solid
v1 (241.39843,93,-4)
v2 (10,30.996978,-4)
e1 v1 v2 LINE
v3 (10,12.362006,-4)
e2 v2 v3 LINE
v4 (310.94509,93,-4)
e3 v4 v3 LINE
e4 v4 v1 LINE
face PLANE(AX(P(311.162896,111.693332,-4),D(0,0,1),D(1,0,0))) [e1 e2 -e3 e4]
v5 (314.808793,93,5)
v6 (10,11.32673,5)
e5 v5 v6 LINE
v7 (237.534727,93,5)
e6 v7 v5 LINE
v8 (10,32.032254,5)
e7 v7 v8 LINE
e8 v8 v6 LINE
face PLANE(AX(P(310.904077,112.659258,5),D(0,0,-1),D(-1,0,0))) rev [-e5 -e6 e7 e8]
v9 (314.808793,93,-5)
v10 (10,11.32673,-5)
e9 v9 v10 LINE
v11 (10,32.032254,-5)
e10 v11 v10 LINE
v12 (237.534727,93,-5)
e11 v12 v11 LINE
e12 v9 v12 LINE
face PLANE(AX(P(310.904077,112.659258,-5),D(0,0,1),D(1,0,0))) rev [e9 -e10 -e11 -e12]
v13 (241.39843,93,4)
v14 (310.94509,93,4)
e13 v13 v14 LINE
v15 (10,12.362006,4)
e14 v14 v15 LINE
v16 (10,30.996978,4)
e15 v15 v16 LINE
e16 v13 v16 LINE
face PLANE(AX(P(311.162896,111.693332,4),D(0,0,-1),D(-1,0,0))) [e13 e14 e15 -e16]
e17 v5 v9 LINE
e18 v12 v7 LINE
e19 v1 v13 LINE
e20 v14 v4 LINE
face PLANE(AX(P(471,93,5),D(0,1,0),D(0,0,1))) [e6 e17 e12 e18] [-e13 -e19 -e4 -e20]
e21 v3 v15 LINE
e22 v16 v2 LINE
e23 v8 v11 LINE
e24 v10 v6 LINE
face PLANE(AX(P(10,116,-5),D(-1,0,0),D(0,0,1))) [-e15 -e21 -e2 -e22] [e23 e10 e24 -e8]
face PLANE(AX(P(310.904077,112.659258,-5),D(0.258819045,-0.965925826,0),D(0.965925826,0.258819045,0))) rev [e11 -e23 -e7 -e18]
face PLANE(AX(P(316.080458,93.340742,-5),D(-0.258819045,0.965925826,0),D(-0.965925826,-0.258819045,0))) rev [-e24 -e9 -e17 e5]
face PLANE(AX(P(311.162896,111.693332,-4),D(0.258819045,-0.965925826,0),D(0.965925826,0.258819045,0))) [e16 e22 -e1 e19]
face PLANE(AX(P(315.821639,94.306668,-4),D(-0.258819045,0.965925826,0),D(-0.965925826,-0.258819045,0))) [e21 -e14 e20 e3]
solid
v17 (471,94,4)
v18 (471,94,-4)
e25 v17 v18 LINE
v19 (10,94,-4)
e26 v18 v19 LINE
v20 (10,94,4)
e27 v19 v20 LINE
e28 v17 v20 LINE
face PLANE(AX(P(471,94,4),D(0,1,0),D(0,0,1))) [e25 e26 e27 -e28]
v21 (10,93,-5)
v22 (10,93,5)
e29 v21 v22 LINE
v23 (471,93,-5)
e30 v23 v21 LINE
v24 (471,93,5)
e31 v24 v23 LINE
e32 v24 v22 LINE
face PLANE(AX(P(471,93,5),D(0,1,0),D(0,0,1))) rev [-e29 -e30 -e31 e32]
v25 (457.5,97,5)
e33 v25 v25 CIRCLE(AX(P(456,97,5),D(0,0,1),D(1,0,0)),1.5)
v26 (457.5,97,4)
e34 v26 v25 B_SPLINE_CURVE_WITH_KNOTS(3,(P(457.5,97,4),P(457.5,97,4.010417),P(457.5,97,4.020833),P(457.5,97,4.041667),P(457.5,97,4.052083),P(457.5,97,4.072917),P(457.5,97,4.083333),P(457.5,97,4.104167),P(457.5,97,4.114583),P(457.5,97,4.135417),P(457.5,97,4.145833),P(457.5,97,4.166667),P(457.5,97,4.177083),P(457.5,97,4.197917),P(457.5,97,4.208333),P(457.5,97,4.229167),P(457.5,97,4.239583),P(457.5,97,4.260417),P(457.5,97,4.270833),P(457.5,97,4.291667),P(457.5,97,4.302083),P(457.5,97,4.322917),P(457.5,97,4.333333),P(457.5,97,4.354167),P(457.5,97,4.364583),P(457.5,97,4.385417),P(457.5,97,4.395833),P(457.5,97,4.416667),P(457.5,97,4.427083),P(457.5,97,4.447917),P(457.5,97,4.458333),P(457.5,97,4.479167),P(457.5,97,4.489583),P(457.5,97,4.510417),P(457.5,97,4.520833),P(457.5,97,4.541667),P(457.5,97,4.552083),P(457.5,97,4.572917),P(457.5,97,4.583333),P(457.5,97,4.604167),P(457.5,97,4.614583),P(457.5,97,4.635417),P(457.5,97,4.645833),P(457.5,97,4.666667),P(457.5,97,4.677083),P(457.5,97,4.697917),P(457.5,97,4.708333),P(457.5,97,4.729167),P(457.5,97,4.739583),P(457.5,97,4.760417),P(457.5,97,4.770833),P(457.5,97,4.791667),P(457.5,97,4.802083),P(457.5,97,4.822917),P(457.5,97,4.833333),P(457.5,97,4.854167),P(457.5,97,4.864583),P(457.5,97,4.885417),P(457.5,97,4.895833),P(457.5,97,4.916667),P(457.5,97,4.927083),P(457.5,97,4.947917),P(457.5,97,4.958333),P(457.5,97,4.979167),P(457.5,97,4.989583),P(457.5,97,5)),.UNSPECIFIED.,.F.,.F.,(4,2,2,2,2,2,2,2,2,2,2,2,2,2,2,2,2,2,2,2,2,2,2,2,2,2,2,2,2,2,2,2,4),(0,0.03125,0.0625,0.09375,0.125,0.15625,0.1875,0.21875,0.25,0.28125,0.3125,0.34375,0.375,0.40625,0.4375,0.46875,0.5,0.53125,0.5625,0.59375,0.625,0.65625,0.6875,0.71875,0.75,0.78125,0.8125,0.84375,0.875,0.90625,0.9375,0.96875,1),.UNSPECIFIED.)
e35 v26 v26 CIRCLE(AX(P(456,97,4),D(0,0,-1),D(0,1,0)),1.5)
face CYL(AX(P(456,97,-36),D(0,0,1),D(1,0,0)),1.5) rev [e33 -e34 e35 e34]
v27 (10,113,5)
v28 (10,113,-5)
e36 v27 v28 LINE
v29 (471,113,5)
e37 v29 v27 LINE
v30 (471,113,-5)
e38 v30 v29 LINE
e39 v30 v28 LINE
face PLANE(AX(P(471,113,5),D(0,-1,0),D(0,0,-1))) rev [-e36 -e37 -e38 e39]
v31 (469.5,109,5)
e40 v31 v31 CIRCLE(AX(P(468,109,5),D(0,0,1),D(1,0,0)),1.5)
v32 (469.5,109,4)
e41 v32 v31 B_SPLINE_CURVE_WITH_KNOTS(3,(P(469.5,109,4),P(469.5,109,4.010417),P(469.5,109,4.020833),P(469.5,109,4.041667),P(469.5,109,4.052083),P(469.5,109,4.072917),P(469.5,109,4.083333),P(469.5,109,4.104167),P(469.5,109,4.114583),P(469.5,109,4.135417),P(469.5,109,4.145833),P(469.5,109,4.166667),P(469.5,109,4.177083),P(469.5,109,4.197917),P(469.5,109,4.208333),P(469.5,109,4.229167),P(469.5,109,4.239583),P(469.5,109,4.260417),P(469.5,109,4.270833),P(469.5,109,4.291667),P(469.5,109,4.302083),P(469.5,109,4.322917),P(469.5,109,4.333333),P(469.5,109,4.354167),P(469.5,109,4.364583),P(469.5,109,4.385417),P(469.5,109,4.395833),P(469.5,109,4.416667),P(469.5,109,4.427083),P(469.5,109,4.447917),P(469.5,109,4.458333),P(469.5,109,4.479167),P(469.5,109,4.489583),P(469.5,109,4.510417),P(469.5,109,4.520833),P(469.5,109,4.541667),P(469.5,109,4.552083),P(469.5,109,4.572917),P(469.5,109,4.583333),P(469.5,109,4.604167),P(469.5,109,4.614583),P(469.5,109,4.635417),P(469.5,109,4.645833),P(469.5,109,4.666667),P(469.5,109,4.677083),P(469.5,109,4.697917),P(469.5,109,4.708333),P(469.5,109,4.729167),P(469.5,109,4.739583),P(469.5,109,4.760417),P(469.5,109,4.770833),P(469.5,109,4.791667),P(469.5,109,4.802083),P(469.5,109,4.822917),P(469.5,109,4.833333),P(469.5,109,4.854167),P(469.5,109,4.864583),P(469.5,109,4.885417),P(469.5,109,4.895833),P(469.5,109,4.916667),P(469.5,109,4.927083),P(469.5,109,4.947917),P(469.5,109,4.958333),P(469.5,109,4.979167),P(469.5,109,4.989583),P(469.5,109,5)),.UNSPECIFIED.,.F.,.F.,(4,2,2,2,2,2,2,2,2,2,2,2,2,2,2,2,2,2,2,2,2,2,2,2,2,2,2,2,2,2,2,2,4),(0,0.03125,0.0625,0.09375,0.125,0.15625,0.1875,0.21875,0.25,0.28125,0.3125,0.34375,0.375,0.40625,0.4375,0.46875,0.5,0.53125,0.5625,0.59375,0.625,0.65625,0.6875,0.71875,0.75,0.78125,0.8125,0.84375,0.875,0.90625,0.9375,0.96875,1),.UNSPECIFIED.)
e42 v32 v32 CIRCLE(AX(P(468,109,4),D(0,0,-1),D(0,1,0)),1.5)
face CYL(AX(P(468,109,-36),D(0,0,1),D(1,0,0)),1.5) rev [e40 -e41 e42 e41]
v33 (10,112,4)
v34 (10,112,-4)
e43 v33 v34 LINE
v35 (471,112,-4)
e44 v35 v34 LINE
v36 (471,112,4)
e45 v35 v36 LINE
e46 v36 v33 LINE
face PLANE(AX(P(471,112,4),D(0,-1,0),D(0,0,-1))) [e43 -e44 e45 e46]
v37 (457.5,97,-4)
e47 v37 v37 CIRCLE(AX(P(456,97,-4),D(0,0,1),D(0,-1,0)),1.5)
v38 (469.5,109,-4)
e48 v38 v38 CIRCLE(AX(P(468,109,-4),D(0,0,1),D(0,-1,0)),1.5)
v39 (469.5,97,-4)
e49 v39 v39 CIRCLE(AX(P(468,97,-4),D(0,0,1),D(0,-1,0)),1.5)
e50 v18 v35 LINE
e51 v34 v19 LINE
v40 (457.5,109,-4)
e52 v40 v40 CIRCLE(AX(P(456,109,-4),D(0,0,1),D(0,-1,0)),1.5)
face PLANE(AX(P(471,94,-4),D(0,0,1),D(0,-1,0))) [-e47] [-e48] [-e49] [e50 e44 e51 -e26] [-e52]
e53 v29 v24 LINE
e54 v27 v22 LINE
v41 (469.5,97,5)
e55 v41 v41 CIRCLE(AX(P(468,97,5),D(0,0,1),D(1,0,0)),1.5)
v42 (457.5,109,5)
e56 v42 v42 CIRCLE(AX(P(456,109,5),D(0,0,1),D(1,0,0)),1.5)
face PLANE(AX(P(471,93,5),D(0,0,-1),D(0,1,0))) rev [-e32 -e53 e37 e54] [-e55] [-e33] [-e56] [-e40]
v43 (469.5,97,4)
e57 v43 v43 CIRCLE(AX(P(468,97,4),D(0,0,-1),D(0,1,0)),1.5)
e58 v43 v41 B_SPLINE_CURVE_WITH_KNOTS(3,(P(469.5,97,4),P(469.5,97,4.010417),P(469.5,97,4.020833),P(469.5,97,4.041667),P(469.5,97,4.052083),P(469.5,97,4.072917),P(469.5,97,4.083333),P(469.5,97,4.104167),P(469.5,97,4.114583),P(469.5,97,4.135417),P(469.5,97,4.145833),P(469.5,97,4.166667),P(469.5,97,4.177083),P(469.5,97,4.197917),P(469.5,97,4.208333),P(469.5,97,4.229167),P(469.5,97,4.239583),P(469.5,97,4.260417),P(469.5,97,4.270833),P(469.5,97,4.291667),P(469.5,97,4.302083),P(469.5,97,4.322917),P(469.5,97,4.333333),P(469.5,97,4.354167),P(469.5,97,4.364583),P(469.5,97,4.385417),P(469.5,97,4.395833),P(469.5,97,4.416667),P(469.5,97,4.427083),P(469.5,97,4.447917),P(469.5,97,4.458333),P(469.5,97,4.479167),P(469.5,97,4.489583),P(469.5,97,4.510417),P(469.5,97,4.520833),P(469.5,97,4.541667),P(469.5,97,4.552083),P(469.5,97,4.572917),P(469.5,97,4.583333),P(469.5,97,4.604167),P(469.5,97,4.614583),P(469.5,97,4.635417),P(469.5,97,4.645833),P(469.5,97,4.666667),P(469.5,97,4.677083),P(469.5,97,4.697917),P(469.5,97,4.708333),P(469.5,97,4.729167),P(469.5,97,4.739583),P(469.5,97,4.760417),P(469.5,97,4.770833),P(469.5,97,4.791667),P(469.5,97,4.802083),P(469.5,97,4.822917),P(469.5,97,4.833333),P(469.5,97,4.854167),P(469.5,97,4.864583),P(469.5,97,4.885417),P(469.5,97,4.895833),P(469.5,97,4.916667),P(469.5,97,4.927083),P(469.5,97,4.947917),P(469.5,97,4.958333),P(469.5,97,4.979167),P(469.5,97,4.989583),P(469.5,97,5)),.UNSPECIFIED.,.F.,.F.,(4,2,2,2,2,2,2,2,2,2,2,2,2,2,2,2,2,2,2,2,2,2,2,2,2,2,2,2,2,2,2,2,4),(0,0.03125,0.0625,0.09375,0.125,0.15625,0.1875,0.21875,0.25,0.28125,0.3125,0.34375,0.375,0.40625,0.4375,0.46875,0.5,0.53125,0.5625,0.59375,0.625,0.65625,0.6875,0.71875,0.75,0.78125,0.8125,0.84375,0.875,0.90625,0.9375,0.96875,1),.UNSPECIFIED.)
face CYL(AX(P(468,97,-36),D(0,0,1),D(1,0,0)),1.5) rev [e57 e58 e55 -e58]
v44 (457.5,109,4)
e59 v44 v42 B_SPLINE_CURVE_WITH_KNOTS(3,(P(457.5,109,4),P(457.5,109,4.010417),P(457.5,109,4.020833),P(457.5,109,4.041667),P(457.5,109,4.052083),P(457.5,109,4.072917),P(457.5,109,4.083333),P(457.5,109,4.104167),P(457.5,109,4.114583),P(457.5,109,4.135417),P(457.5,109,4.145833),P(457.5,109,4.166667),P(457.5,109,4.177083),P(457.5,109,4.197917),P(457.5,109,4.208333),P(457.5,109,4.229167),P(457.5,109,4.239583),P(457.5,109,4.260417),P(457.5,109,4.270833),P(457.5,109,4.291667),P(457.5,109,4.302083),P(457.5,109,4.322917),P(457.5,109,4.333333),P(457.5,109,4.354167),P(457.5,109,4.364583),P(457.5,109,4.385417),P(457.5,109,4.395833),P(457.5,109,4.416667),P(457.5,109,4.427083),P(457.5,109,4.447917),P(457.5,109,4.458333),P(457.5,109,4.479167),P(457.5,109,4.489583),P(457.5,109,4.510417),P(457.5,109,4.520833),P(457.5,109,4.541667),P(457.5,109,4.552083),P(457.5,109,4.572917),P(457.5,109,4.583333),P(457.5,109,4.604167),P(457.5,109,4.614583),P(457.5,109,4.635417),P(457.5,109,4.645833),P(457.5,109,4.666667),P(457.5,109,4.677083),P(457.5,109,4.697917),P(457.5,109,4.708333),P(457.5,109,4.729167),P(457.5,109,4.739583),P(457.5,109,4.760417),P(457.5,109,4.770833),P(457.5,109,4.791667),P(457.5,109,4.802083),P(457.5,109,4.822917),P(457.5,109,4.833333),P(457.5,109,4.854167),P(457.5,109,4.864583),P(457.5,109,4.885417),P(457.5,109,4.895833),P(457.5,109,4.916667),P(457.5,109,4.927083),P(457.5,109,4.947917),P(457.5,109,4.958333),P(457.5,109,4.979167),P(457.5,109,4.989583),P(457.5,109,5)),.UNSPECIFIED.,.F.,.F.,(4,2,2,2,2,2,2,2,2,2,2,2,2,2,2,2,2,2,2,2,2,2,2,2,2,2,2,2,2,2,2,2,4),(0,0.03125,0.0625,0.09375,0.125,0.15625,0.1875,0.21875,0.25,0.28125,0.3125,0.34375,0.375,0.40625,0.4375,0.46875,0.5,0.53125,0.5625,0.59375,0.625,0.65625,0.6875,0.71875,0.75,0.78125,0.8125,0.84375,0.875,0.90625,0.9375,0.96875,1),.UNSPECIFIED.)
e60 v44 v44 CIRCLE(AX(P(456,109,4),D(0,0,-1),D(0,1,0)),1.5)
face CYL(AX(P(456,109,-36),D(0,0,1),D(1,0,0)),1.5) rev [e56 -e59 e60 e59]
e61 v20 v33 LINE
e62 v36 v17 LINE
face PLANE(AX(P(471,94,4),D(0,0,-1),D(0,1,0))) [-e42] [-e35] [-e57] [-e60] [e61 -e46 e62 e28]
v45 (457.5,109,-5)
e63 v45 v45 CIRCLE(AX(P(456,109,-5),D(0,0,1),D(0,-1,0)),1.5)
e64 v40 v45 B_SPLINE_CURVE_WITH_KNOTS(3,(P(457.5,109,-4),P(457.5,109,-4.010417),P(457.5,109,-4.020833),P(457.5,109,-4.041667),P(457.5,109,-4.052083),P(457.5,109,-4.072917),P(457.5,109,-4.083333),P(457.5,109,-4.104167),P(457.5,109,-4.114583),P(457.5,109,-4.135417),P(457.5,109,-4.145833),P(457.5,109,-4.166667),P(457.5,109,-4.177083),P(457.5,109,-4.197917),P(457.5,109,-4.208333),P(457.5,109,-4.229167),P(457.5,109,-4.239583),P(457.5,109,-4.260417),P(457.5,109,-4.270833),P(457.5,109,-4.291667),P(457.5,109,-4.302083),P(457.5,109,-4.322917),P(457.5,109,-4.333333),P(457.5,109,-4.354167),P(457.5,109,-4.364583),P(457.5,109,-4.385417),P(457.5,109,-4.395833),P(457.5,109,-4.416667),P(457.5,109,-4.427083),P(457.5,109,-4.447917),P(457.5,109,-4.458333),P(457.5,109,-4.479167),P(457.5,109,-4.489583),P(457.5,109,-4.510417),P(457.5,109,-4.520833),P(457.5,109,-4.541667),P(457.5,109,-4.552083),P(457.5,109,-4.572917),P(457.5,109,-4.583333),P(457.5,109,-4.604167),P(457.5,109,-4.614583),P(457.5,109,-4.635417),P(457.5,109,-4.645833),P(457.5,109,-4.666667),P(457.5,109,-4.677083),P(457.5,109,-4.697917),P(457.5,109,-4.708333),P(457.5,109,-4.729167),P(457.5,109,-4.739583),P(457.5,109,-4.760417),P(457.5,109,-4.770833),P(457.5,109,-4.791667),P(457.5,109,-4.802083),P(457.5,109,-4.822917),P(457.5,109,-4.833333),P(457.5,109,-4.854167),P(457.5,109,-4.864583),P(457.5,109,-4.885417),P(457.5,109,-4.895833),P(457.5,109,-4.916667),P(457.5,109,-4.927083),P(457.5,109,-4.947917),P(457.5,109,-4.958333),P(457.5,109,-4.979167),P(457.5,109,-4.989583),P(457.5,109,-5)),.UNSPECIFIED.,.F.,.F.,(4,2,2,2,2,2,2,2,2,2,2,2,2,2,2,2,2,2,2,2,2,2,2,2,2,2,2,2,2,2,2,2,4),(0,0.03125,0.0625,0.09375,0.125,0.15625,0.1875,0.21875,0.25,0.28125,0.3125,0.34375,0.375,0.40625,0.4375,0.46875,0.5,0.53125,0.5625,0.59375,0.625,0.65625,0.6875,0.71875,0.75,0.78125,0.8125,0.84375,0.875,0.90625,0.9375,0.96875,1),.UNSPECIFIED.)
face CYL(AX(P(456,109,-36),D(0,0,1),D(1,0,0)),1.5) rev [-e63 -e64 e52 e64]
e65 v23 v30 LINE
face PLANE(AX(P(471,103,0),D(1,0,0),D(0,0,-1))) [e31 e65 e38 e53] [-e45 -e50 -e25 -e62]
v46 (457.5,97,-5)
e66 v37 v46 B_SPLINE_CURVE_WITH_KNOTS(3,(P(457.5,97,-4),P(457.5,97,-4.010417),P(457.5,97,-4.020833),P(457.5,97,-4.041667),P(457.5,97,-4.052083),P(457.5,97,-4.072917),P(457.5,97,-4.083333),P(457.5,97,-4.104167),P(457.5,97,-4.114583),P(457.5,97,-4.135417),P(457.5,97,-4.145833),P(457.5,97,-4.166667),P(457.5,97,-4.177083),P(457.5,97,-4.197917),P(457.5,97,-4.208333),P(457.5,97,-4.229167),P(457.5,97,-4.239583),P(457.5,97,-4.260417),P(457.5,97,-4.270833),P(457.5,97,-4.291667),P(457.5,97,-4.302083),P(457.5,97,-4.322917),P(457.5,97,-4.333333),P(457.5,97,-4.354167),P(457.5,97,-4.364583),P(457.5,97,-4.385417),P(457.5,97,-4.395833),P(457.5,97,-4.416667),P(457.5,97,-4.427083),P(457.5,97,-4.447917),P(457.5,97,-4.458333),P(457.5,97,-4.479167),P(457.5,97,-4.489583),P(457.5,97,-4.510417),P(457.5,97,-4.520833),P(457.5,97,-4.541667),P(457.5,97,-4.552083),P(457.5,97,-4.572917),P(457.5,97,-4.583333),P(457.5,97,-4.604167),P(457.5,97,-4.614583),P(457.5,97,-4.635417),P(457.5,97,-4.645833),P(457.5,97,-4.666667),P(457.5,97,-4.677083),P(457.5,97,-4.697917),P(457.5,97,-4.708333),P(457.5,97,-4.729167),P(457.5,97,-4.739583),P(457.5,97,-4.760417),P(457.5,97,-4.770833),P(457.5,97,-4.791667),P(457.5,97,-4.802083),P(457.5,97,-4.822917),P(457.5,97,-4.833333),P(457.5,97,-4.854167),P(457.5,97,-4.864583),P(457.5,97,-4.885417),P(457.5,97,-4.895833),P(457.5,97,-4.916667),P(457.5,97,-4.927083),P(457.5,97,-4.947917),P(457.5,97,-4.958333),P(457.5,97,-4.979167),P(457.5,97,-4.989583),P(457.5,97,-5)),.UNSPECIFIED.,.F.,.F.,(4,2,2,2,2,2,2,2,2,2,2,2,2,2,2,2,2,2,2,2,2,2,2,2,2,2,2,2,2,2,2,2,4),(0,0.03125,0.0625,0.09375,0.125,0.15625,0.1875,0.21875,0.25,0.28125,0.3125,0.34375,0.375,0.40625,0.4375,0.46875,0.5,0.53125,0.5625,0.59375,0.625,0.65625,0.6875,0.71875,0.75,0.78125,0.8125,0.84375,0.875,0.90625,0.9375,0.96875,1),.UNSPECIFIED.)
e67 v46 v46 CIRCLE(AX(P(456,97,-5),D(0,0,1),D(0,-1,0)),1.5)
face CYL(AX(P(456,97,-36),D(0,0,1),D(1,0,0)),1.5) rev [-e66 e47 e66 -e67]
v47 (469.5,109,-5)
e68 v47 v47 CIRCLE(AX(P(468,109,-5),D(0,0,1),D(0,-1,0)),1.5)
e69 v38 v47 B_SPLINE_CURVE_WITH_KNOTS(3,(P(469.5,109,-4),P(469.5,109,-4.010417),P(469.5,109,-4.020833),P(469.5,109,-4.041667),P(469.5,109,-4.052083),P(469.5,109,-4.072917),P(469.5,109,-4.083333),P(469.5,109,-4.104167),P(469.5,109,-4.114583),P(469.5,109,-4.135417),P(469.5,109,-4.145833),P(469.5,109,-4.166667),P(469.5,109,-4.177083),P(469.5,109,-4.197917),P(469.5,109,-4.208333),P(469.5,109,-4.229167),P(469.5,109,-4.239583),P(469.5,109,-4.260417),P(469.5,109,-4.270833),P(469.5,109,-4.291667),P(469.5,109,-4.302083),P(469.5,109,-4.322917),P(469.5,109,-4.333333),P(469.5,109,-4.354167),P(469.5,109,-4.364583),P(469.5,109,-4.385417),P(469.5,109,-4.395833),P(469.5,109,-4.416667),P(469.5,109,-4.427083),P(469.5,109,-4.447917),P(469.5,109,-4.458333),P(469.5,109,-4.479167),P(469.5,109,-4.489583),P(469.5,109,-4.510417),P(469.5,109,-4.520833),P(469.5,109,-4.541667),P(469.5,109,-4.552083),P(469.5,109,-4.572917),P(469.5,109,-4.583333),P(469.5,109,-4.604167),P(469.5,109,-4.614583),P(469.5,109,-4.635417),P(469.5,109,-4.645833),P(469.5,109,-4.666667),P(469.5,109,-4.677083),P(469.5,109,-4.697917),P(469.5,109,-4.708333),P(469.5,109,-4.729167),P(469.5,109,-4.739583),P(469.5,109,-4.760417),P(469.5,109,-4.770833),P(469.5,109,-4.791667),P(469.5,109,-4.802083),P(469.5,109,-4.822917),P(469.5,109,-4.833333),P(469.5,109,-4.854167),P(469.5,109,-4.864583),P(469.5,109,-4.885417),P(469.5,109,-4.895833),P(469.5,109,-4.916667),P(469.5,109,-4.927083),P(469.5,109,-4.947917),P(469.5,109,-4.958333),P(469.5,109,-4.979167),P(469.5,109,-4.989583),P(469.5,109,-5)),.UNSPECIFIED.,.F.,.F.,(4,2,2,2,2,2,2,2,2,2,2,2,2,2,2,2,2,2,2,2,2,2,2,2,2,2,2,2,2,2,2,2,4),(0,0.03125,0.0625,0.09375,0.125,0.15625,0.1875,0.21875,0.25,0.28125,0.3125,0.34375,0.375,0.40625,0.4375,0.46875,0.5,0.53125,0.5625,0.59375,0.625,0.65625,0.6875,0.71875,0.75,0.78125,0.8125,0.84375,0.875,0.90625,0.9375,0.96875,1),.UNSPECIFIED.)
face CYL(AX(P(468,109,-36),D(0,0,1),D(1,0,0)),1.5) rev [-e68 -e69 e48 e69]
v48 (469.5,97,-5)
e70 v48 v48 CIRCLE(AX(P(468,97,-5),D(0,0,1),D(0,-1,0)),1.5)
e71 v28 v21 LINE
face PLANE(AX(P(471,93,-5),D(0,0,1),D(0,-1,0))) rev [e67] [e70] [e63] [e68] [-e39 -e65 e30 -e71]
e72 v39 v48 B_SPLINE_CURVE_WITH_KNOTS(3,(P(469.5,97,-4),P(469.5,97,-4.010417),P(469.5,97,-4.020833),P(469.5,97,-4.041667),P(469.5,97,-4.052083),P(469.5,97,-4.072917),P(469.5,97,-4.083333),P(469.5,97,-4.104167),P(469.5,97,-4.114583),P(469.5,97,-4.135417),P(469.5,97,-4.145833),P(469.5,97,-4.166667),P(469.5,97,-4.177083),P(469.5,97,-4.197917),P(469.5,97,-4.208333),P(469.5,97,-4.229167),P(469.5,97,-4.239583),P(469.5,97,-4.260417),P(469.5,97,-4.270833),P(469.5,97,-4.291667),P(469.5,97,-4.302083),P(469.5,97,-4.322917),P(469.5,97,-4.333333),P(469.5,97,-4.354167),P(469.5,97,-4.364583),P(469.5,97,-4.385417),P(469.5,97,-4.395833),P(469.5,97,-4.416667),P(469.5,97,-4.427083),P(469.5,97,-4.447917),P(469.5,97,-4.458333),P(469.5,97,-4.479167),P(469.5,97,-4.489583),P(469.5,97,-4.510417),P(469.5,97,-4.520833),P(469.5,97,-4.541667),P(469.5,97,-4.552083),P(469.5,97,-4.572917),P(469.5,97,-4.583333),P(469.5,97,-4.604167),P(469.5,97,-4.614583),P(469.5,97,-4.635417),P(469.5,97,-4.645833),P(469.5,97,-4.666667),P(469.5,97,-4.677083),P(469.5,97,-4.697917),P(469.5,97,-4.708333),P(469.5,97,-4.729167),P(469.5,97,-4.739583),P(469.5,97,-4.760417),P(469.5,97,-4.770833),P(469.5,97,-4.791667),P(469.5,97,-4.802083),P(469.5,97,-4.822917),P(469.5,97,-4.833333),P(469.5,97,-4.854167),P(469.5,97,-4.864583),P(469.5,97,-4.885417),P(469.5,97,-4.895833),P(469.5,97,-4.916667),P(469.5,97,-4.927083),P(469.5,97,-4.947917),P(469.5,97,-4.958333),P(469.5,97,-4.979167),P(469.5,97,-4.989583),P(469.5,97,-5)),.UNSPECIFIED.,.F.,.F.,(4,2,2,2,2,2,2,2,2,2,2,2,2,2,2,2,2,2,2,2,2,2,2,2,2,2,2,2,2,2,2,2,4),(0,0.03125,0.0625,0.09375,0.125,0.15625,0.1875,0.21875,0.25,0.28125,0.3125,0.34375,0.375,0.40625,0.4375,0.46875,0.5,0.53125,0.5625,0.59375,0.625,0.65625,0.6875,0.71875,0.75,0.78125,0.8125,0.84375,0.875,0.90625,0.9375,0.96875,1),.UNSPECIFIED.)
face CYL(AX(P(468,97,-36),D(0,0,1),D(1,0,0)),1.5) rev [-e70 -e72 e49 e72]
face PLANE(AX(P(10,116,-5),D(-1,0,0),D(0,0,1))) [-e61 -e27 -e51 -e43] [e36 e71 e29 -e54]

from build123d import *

# Parameters (mm, degrees)
HS_START                 = -5
HS_10X20X1_1_DEPTH       = 1
HS_START_2               = 4
HS_10X20X1_1_2_DEPTH     = 1
HS_START_3               = -4
HS_10X20X1_1_3_DEPTH     = 8
HS_START_4               = 93
HS_10X20X1_1_4_OUTLINE_W = 461
HS_10X20X1_1_4_OUTLINE_H = 1
HS_10X20X1_1_4_DEPTH     = 20
HS_10X20X1_1_5_OUTLINE_W = 461
HS_10X20X1_1_5_OUTLINE_H = 8
HS_10X20X1_1_5_DEPTH     = 1
HS_START_5               = 112
HS_10X20X1_1_6_OUTLINE_W = 461
HS_10X20X1_1_6_OUTLINE_H = 8
HS_10X20X1_1_6_DEPTH     = 1
HS_START_6               = -10
HS_10X20X1_1_7_OUTLINE_W = 116
HS_10X20X1_1_7_OUTLINE_H = 1
HS_10X20X1_1_7_DEPTH     = 20
HS_10X20X1_1_8_OUTLINE_W = 116
HS_10X20X1_1_8_OUTLINE_H = 8
HS_10X20X1_1_8_DEPTH     = 1
HS_START_7               = 9
HS_10X20X1_1_9_OUTLINE_W = 116
HS_10X20X1_1_9_OUTLINE_H = 8
HS_10X20X1_1_9_DEPTH     = 1
SKETCH_2_W               = 20
SKETCH_2_H               = 116
CUT_EXTRUDE_1_DEPTH      = 10
SKETCH_4_R               = 1.5
CUT_EXTRUDE_3_DEPTH      = 41


# Read off the part's stored shape, not the designer's step: Hs 10X20X1(1)
with BuildPart() as part:
    # Hs 10X20X1(1) outline → Hs 10X20X1(1) (new body)
    with BuildSketch(Plane.XY.offset(HS_START)):
        Polygon((10, 32.032253728), (10, 11.32673012), (314.808792812, 93), (237.534726709, 93), align=None)
    extrude(amount=HS_10X20X1_1_DEPTH)

    # Hs 10X20X1_1 2 outline → Hs 10X20X1_1 2 (add)
    with BuildSketch(Plane.XY.offset(HS_START_2)):
        Polygon((10, 32.032253728), (10, 11.32673012), (314.808792812, 93), (237.534726709, 93), align=None)
    extrude(amount=HS_10X20X1_1_2_DEPTH)

    # Hs 10X20X1_1 3 outline → Hs 10X20X1_1 3 (add)
    with BuildSketch(Plane.XY.offset(HS_START_3)):
        Polygon((10, 32.032253728), (10, 30.996977548), (241.398430014, 93), (237.534726709, 93), align=None)
        Polygon((310.945089507, 93), (10, 12.362006301), (10, 11.32673012), (314.808792812, 93), align=None)
    extrude(amount=HS_10X20X1_1_3_DEPTH)


with BuildPart() as body_2:
    # Hs 10X20X1_1 4 outline → Hs 10X20X1_1 4 (new body)
    with BuildSketch(Plane(origin=(0, 0, 0), x_dir=(1, 0, 0), z_dir=(0, 1, 0)).offset(HS_START_4)):
        with Locations((240.5, -4.5)):
            Rectangle(HS_10X20X1_1_4_OUTLINE_W, HS_10X20X1_1_4_OUTLINE_H)
        with Locations((240.5, 4.5)):
            Rectangle(HS_10X20X1_1_4_OUTLINE_W, HS_10X20X1_1_4_OUTLINE_H)
    extrude(amount=HS_10X20X1_1_4_DEPTH)

    # Hs 10X20X1_1 5 outline → Hs 10X20X1_1 5 (add)
    with BuildSketch(Plane(origin=(0, 0, 0), x_dir=(1, 0, 0), z_dir=(0, 1, 0)).offset(HS_START_4)):
        with Locations((240.5, 0)):
            Rectangle(HS_10X20X1_1_5_OUTLINE_W, HS_10X20X1_1_5_OUTLINE_H)
    extrude(amount=HS_10X20X1_1_5_DEPTH)

    # Hs 10X20X1_1 6 outline → Hs 10X20X1_1 6 (add)
    with BuildSketch(Plane(origin=(0, 0, 0), x_dir=(1, 0, 0), z_dir=(0, 1, 0)).offset(HS_START_5)):
        with Locations((240.5, 0)):
            Rectangle(HS_10X20X1_1_6_OUTLINE_W, HS_10X20X1_1_6_OUTLINE_H)
    extrude(amount=HS_10X20X1_1_6_DEPTH)

    # 草图4 → 切除-拉伸3 (cut)
    with BuildSketch(Plane.XY.offset(5)):
        with Locations((456, 109)):
            Circle(SKETCH_4_R)
        with Locations((456, 97)):
            Circle(SKETCH_4_R)
        with Locations((468, 97)):
            Circle(SKETCH_4_R)
        with Locations((468, 109)):
            Circle(SKETCH_4_R)
    extrude(amount=-CUT_EXTRUDE_3_DEPTH, mode=Mode.SUBTRACT)


with BuildPart() as body_3:
    # Hs 10X20X1_1 7 outline → Hs 10X20X1_1 7 (new body)
    with BuildSketch(Plane.YZ.offset(HS_START_6)):
        with Locations((58, -4.5)):
            Rectangle(HS_10X20X1_1_7_OUTLINE_W, HS_10X20X1_1_7_OUTLINE_H)
        with Locations((58, 4.5)):
            Rectangle(HS_10X20X1_1_7_OUTLINE_W, HS_10X20X1_1_7_OUTLINE_H)
    extrude(amount=HS_10X20X1_1_7_DEPTH)

    # Hs 10X20X1_1 8 outline → Hs 10X20X1_1 8 (add)
    with BuildSketch(Plane.YZ.offset(HS_START_6)):
        with Locations((58, 0)):
            Rectangle(HS_10X20X1_1_8_OUTLINE_W, HS_10X20X1_1_8_OUTLINE_H)
    extrude(amount=HS_10X20X1_1_8_DEPTH)

    # Hs 10X20X1_1 9 outline → Hs 10X20X1_1 9 (add)
    with BuildSketch(Plane.YZ.offset(HS_START_7)):
        with Locations((58, 0)):
            Rectangle(HS_10X20X1_1_9_OUTLINE_W, HS_10X20X1_1_9_OUTLINE_H)
    extrude(amount=HS_10X20X1_1_9_DEPTH)

    # 草图2 → 切除-拉伸1 (cut)
    with BuildSketch(Plane.XY.offset(5)):
        with Locations((0, 58)):
            Rectangle(SKETCH_2_W, SKETCH_2_H)
    extrude(amount=-CUT_EXTRUDE_1_DEPTH, mode=Mode.SUBTRACT)


solid = Compound([part.part, body_2.part])
